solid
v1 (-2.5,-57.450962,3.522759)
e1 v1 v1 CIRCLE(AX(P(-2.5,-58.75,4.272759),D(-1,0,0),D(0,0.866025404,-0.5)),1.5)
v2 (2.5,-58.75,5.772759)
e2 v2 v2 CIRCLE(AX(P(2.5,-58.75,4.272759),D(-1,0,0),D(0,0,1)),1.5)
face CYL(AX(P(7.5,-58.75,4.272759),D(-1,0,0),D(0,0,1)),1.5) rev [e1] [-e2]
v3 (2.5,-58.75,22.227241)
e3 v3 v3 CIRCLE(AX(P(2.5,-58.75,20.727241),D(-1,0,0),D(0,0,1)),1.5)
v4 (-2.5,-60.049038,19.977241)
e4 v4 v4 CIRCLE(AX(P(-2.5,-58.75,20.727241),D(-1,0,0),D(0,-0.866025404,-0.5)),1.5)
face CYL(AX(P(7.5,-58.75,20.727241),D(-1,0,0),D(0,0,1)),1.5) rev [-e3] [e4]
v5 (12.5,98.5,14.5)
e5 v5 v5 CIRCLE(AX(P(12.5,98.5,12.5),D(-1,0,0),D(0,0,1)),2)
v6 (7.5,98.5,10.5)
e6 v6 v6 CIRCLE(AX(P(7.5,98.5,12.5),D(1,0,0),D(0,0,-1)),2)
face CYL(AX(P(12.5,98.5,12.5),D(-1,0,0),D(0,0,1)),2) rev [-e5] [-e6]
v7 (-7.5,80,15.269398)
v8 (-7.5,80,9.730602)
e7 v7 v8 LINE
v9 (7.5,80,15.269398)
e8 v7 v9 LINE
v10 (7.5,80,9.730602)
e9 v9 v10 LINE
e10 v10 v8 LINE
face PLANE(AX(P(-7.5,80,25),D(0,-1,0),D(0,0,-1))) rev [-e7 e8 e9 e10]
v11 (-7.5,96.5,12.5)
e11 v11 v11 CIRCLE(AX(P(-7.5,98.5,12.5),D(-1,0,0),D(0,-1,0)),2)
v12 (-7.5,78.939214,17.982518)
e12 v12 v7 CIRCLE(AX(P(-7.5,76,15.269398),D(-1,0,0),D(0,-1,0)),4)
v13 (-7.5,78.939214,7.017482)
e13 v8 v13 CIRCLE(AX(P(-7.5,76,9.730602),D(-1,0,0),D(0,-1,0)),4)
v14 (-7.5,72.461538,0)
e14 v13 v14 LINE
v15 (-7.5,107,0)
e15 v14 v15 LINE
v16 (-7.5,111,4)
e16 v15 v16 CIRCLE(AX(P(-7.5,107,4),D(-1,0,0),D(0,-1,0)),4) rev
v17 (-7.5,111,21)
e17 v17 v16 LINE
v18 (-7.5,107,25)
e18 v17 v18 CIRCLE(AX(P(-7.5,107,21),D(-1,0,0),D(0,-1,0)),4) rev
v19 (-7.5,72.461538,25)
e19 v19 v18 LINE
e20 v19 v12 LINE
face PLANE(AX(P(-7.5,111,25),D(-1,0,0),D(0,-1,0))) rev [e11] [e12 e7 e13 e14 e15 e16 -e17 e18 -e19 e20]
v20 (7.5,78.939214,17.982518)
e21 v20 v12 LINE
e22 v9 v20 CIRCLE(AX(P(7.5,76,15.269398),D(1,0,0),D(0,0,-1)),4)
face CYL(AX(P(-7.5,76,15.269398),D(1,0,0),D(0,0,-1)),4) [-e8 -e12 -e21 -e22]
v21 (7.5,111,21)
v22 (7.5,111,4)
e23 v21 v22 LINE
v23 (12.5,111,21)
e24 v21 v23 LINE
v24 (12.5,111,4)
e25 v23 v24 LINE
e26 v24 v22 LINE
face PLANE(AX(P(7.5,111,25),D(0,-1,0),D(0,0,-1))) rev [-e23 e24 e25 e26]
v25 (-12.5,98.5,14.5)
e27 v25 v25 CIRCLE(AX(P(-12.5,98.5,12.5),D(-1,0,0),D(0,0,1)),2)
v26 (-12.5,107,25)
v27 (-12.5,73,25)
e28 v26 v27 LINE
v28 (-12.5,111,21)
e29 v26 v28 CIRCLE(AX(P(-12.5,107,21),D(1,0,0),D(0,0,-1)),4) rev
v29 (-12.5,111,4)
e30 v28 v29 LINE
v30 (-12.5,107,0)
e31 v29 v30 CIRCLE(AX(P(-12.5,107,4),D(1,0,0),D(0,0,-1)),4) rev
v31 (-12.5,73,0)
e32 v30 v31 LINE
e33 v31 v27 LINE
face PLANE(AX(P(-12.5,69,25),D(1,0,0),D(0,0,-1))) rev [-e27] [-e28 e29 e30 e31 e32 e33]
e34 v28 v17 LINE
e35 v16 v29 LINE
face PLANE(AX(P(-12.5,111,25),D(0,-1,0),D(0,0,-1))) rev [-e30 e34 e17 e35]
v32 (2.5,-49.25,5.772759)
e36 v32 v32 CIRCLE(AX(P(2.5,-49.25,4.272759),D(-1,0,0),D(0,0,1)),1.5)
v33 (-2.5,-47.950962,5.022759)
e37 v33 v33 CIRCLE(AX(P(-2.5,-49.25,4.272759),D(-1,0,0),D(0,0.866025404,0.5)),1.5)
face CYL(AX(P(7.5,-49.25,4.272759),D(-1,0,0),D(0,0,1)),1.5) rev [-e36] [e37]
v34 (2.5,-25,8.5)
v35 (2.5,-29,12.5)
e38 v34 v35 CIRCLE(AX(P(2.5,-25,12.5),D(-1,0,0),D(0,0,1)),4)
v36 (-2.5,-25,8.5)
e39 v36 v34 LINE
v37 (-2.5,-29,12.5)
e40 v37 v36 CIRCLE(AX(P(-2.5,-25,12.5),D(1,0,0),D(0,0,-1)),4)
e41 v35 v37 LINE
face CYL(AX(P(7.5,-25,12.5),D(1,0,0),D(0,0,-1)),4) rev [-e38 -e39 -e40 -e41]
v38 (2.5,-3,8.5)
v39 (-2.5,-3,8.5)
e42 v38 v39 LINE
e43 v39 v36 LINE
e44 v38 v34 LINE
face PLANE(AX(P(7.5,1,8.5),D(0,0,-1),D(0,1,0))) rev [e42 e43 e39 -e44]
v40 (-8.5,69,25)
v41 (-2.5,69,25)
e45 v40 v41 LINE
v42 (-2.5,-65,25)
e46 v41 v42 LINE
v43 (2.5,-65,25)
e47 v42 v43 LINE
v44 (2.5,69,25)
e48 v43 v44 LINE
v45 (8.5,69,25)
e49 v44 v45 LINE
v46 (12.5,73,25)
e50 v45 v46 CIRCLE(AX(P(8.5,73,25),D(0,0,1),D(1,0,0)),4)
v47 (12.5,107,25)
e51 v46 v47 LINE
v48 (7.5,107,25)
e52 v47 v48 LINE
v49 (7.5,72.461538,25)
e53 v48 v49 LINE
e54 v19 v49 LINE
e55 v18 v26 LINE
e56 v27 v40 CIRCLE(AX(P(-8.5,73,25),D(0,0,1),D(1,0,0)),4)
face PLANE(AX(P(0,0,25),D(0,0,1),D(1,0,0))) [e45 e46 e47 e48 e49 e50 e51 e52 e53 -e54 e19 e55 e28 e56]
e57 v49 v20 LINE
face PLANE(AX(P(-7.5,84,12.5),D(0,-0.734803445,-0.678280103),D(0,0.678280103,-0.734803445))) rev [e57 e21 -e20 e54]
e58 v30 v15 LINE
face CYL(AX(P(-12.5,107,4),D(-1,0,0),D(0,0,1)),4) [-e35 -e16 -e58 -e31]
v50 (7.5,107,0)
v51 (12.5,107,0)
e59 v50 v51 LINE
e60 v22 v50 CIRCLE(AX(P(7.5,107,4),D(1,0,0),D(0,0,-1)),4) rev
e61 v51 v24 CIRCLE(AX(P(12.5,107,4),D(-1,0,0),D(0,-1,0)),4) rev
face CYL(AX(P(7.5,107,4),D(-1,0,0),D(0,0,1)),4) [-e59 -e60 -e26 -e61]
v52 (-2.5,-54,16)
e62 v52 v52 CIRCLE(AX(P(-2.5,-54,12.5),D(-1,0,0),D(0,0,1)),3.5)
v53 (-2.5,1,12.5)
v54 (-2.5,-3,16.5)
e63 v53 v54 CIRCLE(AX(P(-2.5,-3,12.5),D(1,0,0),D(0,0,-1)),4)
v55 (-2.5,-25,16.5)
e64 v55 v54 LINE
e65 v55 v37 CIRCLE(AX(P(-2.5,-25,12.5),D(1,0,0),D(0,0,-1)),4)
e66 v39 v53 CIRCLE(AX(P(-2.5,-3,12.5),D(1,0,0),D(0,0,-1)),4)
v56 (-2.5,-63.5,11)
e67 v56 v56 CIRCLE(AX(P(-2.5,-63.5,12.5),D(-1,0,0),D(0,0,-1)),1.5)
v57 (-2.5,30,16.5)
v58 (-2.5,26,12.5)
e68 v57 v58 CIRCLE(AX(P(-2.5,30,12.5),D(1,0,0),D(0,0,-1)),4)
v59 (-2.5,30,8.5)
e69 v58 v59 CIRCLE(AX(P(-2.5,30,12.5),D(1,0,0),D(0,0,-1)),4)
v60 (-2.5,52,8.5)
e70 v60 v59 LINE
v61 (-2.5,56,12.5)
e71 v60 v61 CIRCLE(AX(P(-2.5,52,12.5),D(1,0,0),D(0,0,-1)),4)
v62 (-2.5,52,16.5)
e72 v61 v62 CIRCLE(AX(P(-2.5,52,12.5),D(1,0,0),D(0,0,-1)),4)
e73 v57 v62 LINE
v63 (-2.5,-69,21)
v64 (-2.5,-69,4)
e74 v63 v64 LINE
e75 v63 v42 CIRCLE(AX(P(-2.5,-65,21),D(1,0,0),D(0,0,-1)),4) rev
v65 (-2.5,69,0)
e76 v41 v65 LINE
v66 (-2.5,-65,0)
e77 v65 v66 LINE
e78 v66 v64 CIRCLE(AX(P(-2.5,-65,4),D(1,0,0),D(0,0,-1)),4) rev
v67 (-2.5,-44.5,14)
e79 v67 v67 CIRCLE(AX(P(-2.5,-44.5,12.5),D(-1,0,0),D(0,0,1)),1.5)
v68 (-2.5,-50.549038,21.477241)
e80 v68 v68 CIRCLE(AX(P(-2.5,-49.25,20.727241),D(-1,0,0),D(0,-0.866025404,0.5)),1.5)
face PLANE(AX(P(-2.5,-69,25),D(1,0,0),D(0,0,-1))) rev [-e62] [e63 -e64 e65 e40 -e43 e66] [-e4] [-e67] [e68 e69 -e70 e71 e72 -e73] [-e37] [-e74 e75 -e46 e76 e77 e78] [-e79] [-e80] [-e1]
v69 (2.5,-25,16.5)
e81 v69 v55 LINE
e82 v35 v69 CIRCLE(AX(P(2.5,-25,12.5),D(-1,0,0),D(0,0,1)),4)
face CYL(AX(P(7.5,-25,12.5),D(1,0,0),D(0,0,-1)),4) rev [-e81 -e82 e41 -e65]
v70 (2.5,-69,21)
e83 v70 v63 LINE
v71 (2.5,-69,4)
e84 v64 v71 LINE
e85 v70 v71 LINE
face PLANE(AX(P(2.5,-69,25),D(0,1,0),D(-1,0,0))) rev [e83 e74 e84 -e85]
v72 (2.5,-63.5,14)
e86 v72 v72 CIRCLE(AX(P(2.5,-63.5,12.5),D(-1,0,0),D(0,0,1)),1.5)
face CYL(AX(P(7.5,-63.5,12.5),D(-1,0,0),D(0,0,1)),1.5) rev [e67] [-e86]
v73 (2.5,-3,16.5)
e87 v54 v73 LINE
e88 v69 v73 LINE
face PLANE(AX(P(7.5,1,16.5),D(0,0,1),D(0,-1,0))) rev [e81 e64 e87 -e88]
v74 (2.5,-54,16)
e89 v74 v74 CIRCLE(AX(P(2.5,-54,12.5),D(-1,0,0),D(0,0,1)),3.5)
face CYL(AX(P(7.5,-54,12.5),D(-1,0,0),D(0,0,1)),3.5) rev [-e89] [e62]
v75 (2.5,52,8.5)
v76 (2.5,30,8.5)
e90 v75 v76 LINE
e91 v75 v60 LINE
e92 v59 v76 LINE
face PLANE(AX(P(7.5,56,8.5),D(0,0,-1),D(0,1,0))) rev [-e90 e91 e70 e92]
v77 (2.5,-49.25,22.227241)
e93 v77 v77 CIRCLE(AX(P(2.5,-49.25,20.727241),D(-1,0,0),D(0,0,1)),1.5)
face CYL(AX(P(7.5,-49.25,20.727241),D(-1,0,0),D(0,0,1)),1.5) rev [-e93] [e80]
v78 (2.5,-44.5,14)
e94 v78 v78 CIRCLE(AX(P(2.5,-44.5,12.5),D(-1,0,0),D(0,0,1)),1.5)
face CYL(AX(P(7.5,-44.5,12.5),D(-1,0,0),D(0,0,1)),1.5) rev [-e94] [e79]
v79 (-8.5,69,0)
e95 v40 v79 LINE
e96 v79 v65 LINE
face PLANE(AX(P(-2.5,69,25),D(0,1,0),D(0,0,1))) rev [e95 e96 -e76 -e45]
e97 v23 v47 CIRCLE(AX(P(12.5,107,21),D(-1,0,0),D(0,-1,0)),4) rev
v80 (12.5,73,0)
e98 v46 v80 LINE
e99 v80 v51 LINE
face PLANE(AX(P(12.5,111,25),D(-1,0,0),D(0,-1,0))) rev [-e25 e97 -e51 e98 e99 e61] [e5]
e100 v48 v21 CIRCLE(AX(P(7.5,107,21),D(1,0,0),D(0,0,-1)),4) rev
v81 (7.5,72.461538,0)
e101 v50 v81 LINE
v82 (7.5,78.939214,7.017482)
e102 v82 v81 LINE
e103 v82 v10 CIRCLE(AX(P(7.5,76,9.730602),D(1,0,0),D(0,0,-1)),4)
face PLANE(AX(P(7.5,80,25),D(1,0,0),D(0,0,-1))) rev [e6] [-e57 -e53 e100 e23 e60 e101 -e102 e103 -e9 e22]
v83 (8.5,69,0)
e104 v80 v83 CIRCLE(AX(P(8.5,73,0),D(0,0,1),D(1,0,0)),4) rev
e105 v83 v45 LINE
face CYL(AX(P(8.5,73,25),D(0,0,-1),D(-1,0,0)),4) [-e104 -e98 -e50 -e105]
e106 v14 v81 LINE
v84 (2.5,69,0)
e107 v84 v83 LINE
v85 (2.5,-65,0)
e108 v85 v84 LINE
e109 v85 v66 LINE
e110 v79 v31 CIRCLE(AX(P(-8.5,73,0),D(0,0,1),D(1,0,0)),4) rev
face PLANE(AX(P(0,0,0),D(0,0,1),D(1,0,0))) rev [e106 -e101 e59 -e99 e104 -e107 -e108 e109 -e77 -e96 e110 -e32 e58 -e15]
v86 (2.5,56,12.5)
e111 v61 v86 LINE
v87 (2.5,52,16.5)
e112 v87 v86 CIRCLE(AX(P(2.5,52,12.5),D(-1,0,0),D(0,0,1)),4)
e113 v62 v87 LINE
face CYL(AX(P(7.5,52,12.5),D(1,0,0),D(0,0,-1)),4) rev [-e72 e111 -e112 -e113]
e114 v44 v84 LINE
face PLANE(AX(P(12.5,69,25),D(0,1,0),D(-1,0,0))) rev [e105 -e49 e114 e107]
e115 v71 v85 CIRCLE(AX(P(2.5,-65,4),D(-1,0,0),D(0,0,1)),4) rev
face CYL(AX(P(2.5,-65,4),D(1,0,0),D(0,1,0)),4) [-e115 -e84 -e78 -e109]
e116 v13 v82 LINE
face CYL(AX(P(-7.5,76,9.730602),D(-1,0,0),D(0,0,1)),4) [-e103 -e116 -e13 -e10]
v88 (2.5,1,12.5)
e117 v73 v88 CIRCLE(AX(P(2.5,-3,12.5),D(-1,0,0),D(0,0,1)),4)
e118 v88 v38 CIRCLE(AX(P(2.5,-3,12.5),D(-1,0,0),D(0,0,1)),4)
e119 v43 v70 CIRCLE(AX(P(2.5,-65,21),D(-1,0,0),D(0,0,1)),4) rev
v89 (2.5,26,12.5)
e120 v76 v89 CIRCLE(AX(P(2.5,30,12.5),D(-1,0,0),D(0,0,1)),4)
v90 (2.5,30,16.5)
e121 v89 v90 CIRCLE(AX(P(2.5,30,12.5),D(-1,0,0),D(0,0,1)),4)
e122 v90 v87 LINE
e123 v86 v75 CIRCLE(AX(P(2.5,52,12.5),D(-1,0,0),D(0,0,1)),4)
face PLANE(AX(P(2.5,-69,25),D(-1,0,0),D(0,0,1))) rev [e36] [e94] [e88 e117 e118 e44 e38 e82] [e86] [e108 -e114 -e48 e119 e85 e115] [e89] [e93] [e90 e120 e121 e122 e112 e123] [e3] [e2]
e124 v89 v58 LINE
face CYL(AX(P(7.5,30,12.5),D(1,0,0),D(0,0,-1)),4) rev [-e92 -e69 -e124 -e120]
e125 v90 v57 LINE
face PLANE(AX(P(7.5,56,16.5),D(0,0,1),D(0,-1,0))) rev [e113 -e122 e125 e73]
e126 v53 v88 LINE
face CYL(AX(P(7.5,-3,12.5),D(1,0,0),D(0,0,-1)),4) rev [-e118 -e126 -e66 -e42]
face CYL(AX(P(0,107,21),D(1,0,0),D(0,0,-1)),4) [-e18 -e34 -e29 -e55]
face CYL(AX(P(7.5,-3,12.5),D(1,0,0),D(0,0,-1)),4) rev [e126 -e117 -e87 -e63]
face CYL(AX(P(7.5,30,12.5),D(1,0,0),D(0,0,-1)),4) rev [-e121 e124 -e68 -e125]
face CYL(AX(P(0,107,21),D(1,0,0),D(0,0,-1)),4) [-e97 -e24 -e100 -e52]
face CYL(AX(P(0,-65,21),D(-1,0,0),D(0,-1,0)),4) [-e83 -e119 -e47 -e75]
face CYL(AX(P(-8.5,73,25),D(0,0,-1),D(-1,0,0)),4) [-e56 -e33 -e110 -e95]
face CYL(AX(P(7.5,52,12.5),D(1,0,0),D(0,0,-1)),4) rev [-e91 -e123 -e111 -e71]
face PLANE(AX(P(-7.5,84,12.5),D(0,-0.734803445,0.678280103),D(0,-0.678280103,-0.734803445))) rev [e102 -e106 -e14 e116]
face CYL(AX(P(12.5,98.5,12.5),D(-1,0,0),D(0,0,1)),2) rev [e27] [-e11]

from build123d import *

# Parameters (mm, degrees)
Y_KSEKLIK_EKSTR_ZYON1_DEPTH = 25
IZIM2_R                     = 2
KES_EKSTR_ZYON1_DEPTH       = 25
IZIM3_R                     = 3.5
IZIM3_W                     = 8
IZIM3_H                     = 30
KES_EKSTR_ZYON2_DEPTH       = 10
IZIM4_R                     = 1.5
KES_EKSTR_ZYON3_DEPTH       = 10
DAIRESEL_KAPLAMA2_COUNT     = 6
CUT_EXTRUDE8_DEPTH          = 7.5
RADYUS1_R                   = 4


with BuildPart() as part:
    # Çizim1 → Yükseklik-Ekstrüzyon1 (new body)
    with BuildSketch(Plane.XY):
        Polygon((-2.5, 69), (-12.5, 69), (-12.5, 111), (-7.5, 111), (-7.5, 80), (7.5, 80), (7.5, 111), (12.5, 111), (12.5, 69), (2.5, 69), (2.5, -69), (-2.5, -69), align=None)
    extrude(amount=Y_KSEKLIK_EKSTR_ZYON1_DEPTH)

    # Çizim2 → Kes-Ekstrüzyon1 (cut)
    with BuildSketch(Plane.ZY.offset(12.5)):
        with Locations((12.5, 98.5)):
            Circle(IZIM2_R)
    extrude(amount=-KES_EKSTR_ZYON1_DEPTH, mode=Mode.SUBTRACT)

    # Çizim3 → Kes-Ekstrüzyon2 (cut)
    with BuildSketch(Plane.ZY.offset(2.5)):
        with Locations((12.5, -54)):
            Circle(IZIM3_R)
        with Locations((12.5, 41)):
            Rectangle(IZIM3_W, IZIM3_H)
        with Locations((12.5, -14)):
            Rectangle(IZIM3_W, IZIM3_H)
    extrude(amount=-KES_EKSTR_ZYON2_DEPTH, mode=Mode.SUBTRACT)

    # Çizim4 → Kes-Ekstrüzyon3 (cut)
    with BuildSketch(Plane.ZY.offset(2.5)):
        with Locations((12.5, -44.5)):
            Circle(IZIM4_R)
    kes_ekstr_zyon3 = extrude(amount=-KES_EKSTR_ZYON3_DEPTH, mode=Mode.SUBTRACT)

    # Dairesel Kaplama2: Kes-Ekstrüzyon3 ×6 about axis
    dairesel_kaplama2_axis = Axis((0, -54, 12.5), (1, 0, 0))
    for i in range(1, DAIRESEL_KAPLAMA2_COUNT):
        add(kes_ekstr_zyon3.rotate(dairesel_kaplama2_axis, i * 360 / DAIRESEL_KAPLAMA2_COUNT), mode=Mode.SUBTRACT)

    # Sketch2 → Cut-Extrude8 (cut, symmetric)
    with BuildSketch(Plane(origin=(0, 0, 0), x_dir=(0, 0, -1), z_dir=(1, 0, 0))):
        Polygon((-12.5, 84), (-25.5, 72), (-25.5, 86), (0.5, 86), (0.5, 72), align=None)
    extrude(amount=CUT_EXTRUDE8_DEPTH, both=True, mode=Mode.SUBTRACT)

    # Radyus1
    radyus1_edges = [part.edges().sort_by_distance(p)[0] for p in [
        (-10, 111, 25),
        (10, 111, 25),
        (10, 111, 0),
        (-10, 111, 0),
        (0, 26, 16.5),
        (0, 56, 16.5),
        (0, 26, 8.5),
        (0, 56, 8.5),
        (0, -29, 16.5),
        (0, -29, 8.5),
        (0, 1, 16.5),
        (0, 1, 8.5),
        (0, -69, 25),
        (0, -69, 0),
        (0, 80, 16.833333333),
        (0, 80, 8.166666667),
        (12.5, 69, 12.5),
        (-12.5, 69, 12.5),
    ]]
    fillet(radyus1_edges, radius=RADYUS1_R - 0.0001)  # a hair under: the kernel refuses the full size


solid = part.part
